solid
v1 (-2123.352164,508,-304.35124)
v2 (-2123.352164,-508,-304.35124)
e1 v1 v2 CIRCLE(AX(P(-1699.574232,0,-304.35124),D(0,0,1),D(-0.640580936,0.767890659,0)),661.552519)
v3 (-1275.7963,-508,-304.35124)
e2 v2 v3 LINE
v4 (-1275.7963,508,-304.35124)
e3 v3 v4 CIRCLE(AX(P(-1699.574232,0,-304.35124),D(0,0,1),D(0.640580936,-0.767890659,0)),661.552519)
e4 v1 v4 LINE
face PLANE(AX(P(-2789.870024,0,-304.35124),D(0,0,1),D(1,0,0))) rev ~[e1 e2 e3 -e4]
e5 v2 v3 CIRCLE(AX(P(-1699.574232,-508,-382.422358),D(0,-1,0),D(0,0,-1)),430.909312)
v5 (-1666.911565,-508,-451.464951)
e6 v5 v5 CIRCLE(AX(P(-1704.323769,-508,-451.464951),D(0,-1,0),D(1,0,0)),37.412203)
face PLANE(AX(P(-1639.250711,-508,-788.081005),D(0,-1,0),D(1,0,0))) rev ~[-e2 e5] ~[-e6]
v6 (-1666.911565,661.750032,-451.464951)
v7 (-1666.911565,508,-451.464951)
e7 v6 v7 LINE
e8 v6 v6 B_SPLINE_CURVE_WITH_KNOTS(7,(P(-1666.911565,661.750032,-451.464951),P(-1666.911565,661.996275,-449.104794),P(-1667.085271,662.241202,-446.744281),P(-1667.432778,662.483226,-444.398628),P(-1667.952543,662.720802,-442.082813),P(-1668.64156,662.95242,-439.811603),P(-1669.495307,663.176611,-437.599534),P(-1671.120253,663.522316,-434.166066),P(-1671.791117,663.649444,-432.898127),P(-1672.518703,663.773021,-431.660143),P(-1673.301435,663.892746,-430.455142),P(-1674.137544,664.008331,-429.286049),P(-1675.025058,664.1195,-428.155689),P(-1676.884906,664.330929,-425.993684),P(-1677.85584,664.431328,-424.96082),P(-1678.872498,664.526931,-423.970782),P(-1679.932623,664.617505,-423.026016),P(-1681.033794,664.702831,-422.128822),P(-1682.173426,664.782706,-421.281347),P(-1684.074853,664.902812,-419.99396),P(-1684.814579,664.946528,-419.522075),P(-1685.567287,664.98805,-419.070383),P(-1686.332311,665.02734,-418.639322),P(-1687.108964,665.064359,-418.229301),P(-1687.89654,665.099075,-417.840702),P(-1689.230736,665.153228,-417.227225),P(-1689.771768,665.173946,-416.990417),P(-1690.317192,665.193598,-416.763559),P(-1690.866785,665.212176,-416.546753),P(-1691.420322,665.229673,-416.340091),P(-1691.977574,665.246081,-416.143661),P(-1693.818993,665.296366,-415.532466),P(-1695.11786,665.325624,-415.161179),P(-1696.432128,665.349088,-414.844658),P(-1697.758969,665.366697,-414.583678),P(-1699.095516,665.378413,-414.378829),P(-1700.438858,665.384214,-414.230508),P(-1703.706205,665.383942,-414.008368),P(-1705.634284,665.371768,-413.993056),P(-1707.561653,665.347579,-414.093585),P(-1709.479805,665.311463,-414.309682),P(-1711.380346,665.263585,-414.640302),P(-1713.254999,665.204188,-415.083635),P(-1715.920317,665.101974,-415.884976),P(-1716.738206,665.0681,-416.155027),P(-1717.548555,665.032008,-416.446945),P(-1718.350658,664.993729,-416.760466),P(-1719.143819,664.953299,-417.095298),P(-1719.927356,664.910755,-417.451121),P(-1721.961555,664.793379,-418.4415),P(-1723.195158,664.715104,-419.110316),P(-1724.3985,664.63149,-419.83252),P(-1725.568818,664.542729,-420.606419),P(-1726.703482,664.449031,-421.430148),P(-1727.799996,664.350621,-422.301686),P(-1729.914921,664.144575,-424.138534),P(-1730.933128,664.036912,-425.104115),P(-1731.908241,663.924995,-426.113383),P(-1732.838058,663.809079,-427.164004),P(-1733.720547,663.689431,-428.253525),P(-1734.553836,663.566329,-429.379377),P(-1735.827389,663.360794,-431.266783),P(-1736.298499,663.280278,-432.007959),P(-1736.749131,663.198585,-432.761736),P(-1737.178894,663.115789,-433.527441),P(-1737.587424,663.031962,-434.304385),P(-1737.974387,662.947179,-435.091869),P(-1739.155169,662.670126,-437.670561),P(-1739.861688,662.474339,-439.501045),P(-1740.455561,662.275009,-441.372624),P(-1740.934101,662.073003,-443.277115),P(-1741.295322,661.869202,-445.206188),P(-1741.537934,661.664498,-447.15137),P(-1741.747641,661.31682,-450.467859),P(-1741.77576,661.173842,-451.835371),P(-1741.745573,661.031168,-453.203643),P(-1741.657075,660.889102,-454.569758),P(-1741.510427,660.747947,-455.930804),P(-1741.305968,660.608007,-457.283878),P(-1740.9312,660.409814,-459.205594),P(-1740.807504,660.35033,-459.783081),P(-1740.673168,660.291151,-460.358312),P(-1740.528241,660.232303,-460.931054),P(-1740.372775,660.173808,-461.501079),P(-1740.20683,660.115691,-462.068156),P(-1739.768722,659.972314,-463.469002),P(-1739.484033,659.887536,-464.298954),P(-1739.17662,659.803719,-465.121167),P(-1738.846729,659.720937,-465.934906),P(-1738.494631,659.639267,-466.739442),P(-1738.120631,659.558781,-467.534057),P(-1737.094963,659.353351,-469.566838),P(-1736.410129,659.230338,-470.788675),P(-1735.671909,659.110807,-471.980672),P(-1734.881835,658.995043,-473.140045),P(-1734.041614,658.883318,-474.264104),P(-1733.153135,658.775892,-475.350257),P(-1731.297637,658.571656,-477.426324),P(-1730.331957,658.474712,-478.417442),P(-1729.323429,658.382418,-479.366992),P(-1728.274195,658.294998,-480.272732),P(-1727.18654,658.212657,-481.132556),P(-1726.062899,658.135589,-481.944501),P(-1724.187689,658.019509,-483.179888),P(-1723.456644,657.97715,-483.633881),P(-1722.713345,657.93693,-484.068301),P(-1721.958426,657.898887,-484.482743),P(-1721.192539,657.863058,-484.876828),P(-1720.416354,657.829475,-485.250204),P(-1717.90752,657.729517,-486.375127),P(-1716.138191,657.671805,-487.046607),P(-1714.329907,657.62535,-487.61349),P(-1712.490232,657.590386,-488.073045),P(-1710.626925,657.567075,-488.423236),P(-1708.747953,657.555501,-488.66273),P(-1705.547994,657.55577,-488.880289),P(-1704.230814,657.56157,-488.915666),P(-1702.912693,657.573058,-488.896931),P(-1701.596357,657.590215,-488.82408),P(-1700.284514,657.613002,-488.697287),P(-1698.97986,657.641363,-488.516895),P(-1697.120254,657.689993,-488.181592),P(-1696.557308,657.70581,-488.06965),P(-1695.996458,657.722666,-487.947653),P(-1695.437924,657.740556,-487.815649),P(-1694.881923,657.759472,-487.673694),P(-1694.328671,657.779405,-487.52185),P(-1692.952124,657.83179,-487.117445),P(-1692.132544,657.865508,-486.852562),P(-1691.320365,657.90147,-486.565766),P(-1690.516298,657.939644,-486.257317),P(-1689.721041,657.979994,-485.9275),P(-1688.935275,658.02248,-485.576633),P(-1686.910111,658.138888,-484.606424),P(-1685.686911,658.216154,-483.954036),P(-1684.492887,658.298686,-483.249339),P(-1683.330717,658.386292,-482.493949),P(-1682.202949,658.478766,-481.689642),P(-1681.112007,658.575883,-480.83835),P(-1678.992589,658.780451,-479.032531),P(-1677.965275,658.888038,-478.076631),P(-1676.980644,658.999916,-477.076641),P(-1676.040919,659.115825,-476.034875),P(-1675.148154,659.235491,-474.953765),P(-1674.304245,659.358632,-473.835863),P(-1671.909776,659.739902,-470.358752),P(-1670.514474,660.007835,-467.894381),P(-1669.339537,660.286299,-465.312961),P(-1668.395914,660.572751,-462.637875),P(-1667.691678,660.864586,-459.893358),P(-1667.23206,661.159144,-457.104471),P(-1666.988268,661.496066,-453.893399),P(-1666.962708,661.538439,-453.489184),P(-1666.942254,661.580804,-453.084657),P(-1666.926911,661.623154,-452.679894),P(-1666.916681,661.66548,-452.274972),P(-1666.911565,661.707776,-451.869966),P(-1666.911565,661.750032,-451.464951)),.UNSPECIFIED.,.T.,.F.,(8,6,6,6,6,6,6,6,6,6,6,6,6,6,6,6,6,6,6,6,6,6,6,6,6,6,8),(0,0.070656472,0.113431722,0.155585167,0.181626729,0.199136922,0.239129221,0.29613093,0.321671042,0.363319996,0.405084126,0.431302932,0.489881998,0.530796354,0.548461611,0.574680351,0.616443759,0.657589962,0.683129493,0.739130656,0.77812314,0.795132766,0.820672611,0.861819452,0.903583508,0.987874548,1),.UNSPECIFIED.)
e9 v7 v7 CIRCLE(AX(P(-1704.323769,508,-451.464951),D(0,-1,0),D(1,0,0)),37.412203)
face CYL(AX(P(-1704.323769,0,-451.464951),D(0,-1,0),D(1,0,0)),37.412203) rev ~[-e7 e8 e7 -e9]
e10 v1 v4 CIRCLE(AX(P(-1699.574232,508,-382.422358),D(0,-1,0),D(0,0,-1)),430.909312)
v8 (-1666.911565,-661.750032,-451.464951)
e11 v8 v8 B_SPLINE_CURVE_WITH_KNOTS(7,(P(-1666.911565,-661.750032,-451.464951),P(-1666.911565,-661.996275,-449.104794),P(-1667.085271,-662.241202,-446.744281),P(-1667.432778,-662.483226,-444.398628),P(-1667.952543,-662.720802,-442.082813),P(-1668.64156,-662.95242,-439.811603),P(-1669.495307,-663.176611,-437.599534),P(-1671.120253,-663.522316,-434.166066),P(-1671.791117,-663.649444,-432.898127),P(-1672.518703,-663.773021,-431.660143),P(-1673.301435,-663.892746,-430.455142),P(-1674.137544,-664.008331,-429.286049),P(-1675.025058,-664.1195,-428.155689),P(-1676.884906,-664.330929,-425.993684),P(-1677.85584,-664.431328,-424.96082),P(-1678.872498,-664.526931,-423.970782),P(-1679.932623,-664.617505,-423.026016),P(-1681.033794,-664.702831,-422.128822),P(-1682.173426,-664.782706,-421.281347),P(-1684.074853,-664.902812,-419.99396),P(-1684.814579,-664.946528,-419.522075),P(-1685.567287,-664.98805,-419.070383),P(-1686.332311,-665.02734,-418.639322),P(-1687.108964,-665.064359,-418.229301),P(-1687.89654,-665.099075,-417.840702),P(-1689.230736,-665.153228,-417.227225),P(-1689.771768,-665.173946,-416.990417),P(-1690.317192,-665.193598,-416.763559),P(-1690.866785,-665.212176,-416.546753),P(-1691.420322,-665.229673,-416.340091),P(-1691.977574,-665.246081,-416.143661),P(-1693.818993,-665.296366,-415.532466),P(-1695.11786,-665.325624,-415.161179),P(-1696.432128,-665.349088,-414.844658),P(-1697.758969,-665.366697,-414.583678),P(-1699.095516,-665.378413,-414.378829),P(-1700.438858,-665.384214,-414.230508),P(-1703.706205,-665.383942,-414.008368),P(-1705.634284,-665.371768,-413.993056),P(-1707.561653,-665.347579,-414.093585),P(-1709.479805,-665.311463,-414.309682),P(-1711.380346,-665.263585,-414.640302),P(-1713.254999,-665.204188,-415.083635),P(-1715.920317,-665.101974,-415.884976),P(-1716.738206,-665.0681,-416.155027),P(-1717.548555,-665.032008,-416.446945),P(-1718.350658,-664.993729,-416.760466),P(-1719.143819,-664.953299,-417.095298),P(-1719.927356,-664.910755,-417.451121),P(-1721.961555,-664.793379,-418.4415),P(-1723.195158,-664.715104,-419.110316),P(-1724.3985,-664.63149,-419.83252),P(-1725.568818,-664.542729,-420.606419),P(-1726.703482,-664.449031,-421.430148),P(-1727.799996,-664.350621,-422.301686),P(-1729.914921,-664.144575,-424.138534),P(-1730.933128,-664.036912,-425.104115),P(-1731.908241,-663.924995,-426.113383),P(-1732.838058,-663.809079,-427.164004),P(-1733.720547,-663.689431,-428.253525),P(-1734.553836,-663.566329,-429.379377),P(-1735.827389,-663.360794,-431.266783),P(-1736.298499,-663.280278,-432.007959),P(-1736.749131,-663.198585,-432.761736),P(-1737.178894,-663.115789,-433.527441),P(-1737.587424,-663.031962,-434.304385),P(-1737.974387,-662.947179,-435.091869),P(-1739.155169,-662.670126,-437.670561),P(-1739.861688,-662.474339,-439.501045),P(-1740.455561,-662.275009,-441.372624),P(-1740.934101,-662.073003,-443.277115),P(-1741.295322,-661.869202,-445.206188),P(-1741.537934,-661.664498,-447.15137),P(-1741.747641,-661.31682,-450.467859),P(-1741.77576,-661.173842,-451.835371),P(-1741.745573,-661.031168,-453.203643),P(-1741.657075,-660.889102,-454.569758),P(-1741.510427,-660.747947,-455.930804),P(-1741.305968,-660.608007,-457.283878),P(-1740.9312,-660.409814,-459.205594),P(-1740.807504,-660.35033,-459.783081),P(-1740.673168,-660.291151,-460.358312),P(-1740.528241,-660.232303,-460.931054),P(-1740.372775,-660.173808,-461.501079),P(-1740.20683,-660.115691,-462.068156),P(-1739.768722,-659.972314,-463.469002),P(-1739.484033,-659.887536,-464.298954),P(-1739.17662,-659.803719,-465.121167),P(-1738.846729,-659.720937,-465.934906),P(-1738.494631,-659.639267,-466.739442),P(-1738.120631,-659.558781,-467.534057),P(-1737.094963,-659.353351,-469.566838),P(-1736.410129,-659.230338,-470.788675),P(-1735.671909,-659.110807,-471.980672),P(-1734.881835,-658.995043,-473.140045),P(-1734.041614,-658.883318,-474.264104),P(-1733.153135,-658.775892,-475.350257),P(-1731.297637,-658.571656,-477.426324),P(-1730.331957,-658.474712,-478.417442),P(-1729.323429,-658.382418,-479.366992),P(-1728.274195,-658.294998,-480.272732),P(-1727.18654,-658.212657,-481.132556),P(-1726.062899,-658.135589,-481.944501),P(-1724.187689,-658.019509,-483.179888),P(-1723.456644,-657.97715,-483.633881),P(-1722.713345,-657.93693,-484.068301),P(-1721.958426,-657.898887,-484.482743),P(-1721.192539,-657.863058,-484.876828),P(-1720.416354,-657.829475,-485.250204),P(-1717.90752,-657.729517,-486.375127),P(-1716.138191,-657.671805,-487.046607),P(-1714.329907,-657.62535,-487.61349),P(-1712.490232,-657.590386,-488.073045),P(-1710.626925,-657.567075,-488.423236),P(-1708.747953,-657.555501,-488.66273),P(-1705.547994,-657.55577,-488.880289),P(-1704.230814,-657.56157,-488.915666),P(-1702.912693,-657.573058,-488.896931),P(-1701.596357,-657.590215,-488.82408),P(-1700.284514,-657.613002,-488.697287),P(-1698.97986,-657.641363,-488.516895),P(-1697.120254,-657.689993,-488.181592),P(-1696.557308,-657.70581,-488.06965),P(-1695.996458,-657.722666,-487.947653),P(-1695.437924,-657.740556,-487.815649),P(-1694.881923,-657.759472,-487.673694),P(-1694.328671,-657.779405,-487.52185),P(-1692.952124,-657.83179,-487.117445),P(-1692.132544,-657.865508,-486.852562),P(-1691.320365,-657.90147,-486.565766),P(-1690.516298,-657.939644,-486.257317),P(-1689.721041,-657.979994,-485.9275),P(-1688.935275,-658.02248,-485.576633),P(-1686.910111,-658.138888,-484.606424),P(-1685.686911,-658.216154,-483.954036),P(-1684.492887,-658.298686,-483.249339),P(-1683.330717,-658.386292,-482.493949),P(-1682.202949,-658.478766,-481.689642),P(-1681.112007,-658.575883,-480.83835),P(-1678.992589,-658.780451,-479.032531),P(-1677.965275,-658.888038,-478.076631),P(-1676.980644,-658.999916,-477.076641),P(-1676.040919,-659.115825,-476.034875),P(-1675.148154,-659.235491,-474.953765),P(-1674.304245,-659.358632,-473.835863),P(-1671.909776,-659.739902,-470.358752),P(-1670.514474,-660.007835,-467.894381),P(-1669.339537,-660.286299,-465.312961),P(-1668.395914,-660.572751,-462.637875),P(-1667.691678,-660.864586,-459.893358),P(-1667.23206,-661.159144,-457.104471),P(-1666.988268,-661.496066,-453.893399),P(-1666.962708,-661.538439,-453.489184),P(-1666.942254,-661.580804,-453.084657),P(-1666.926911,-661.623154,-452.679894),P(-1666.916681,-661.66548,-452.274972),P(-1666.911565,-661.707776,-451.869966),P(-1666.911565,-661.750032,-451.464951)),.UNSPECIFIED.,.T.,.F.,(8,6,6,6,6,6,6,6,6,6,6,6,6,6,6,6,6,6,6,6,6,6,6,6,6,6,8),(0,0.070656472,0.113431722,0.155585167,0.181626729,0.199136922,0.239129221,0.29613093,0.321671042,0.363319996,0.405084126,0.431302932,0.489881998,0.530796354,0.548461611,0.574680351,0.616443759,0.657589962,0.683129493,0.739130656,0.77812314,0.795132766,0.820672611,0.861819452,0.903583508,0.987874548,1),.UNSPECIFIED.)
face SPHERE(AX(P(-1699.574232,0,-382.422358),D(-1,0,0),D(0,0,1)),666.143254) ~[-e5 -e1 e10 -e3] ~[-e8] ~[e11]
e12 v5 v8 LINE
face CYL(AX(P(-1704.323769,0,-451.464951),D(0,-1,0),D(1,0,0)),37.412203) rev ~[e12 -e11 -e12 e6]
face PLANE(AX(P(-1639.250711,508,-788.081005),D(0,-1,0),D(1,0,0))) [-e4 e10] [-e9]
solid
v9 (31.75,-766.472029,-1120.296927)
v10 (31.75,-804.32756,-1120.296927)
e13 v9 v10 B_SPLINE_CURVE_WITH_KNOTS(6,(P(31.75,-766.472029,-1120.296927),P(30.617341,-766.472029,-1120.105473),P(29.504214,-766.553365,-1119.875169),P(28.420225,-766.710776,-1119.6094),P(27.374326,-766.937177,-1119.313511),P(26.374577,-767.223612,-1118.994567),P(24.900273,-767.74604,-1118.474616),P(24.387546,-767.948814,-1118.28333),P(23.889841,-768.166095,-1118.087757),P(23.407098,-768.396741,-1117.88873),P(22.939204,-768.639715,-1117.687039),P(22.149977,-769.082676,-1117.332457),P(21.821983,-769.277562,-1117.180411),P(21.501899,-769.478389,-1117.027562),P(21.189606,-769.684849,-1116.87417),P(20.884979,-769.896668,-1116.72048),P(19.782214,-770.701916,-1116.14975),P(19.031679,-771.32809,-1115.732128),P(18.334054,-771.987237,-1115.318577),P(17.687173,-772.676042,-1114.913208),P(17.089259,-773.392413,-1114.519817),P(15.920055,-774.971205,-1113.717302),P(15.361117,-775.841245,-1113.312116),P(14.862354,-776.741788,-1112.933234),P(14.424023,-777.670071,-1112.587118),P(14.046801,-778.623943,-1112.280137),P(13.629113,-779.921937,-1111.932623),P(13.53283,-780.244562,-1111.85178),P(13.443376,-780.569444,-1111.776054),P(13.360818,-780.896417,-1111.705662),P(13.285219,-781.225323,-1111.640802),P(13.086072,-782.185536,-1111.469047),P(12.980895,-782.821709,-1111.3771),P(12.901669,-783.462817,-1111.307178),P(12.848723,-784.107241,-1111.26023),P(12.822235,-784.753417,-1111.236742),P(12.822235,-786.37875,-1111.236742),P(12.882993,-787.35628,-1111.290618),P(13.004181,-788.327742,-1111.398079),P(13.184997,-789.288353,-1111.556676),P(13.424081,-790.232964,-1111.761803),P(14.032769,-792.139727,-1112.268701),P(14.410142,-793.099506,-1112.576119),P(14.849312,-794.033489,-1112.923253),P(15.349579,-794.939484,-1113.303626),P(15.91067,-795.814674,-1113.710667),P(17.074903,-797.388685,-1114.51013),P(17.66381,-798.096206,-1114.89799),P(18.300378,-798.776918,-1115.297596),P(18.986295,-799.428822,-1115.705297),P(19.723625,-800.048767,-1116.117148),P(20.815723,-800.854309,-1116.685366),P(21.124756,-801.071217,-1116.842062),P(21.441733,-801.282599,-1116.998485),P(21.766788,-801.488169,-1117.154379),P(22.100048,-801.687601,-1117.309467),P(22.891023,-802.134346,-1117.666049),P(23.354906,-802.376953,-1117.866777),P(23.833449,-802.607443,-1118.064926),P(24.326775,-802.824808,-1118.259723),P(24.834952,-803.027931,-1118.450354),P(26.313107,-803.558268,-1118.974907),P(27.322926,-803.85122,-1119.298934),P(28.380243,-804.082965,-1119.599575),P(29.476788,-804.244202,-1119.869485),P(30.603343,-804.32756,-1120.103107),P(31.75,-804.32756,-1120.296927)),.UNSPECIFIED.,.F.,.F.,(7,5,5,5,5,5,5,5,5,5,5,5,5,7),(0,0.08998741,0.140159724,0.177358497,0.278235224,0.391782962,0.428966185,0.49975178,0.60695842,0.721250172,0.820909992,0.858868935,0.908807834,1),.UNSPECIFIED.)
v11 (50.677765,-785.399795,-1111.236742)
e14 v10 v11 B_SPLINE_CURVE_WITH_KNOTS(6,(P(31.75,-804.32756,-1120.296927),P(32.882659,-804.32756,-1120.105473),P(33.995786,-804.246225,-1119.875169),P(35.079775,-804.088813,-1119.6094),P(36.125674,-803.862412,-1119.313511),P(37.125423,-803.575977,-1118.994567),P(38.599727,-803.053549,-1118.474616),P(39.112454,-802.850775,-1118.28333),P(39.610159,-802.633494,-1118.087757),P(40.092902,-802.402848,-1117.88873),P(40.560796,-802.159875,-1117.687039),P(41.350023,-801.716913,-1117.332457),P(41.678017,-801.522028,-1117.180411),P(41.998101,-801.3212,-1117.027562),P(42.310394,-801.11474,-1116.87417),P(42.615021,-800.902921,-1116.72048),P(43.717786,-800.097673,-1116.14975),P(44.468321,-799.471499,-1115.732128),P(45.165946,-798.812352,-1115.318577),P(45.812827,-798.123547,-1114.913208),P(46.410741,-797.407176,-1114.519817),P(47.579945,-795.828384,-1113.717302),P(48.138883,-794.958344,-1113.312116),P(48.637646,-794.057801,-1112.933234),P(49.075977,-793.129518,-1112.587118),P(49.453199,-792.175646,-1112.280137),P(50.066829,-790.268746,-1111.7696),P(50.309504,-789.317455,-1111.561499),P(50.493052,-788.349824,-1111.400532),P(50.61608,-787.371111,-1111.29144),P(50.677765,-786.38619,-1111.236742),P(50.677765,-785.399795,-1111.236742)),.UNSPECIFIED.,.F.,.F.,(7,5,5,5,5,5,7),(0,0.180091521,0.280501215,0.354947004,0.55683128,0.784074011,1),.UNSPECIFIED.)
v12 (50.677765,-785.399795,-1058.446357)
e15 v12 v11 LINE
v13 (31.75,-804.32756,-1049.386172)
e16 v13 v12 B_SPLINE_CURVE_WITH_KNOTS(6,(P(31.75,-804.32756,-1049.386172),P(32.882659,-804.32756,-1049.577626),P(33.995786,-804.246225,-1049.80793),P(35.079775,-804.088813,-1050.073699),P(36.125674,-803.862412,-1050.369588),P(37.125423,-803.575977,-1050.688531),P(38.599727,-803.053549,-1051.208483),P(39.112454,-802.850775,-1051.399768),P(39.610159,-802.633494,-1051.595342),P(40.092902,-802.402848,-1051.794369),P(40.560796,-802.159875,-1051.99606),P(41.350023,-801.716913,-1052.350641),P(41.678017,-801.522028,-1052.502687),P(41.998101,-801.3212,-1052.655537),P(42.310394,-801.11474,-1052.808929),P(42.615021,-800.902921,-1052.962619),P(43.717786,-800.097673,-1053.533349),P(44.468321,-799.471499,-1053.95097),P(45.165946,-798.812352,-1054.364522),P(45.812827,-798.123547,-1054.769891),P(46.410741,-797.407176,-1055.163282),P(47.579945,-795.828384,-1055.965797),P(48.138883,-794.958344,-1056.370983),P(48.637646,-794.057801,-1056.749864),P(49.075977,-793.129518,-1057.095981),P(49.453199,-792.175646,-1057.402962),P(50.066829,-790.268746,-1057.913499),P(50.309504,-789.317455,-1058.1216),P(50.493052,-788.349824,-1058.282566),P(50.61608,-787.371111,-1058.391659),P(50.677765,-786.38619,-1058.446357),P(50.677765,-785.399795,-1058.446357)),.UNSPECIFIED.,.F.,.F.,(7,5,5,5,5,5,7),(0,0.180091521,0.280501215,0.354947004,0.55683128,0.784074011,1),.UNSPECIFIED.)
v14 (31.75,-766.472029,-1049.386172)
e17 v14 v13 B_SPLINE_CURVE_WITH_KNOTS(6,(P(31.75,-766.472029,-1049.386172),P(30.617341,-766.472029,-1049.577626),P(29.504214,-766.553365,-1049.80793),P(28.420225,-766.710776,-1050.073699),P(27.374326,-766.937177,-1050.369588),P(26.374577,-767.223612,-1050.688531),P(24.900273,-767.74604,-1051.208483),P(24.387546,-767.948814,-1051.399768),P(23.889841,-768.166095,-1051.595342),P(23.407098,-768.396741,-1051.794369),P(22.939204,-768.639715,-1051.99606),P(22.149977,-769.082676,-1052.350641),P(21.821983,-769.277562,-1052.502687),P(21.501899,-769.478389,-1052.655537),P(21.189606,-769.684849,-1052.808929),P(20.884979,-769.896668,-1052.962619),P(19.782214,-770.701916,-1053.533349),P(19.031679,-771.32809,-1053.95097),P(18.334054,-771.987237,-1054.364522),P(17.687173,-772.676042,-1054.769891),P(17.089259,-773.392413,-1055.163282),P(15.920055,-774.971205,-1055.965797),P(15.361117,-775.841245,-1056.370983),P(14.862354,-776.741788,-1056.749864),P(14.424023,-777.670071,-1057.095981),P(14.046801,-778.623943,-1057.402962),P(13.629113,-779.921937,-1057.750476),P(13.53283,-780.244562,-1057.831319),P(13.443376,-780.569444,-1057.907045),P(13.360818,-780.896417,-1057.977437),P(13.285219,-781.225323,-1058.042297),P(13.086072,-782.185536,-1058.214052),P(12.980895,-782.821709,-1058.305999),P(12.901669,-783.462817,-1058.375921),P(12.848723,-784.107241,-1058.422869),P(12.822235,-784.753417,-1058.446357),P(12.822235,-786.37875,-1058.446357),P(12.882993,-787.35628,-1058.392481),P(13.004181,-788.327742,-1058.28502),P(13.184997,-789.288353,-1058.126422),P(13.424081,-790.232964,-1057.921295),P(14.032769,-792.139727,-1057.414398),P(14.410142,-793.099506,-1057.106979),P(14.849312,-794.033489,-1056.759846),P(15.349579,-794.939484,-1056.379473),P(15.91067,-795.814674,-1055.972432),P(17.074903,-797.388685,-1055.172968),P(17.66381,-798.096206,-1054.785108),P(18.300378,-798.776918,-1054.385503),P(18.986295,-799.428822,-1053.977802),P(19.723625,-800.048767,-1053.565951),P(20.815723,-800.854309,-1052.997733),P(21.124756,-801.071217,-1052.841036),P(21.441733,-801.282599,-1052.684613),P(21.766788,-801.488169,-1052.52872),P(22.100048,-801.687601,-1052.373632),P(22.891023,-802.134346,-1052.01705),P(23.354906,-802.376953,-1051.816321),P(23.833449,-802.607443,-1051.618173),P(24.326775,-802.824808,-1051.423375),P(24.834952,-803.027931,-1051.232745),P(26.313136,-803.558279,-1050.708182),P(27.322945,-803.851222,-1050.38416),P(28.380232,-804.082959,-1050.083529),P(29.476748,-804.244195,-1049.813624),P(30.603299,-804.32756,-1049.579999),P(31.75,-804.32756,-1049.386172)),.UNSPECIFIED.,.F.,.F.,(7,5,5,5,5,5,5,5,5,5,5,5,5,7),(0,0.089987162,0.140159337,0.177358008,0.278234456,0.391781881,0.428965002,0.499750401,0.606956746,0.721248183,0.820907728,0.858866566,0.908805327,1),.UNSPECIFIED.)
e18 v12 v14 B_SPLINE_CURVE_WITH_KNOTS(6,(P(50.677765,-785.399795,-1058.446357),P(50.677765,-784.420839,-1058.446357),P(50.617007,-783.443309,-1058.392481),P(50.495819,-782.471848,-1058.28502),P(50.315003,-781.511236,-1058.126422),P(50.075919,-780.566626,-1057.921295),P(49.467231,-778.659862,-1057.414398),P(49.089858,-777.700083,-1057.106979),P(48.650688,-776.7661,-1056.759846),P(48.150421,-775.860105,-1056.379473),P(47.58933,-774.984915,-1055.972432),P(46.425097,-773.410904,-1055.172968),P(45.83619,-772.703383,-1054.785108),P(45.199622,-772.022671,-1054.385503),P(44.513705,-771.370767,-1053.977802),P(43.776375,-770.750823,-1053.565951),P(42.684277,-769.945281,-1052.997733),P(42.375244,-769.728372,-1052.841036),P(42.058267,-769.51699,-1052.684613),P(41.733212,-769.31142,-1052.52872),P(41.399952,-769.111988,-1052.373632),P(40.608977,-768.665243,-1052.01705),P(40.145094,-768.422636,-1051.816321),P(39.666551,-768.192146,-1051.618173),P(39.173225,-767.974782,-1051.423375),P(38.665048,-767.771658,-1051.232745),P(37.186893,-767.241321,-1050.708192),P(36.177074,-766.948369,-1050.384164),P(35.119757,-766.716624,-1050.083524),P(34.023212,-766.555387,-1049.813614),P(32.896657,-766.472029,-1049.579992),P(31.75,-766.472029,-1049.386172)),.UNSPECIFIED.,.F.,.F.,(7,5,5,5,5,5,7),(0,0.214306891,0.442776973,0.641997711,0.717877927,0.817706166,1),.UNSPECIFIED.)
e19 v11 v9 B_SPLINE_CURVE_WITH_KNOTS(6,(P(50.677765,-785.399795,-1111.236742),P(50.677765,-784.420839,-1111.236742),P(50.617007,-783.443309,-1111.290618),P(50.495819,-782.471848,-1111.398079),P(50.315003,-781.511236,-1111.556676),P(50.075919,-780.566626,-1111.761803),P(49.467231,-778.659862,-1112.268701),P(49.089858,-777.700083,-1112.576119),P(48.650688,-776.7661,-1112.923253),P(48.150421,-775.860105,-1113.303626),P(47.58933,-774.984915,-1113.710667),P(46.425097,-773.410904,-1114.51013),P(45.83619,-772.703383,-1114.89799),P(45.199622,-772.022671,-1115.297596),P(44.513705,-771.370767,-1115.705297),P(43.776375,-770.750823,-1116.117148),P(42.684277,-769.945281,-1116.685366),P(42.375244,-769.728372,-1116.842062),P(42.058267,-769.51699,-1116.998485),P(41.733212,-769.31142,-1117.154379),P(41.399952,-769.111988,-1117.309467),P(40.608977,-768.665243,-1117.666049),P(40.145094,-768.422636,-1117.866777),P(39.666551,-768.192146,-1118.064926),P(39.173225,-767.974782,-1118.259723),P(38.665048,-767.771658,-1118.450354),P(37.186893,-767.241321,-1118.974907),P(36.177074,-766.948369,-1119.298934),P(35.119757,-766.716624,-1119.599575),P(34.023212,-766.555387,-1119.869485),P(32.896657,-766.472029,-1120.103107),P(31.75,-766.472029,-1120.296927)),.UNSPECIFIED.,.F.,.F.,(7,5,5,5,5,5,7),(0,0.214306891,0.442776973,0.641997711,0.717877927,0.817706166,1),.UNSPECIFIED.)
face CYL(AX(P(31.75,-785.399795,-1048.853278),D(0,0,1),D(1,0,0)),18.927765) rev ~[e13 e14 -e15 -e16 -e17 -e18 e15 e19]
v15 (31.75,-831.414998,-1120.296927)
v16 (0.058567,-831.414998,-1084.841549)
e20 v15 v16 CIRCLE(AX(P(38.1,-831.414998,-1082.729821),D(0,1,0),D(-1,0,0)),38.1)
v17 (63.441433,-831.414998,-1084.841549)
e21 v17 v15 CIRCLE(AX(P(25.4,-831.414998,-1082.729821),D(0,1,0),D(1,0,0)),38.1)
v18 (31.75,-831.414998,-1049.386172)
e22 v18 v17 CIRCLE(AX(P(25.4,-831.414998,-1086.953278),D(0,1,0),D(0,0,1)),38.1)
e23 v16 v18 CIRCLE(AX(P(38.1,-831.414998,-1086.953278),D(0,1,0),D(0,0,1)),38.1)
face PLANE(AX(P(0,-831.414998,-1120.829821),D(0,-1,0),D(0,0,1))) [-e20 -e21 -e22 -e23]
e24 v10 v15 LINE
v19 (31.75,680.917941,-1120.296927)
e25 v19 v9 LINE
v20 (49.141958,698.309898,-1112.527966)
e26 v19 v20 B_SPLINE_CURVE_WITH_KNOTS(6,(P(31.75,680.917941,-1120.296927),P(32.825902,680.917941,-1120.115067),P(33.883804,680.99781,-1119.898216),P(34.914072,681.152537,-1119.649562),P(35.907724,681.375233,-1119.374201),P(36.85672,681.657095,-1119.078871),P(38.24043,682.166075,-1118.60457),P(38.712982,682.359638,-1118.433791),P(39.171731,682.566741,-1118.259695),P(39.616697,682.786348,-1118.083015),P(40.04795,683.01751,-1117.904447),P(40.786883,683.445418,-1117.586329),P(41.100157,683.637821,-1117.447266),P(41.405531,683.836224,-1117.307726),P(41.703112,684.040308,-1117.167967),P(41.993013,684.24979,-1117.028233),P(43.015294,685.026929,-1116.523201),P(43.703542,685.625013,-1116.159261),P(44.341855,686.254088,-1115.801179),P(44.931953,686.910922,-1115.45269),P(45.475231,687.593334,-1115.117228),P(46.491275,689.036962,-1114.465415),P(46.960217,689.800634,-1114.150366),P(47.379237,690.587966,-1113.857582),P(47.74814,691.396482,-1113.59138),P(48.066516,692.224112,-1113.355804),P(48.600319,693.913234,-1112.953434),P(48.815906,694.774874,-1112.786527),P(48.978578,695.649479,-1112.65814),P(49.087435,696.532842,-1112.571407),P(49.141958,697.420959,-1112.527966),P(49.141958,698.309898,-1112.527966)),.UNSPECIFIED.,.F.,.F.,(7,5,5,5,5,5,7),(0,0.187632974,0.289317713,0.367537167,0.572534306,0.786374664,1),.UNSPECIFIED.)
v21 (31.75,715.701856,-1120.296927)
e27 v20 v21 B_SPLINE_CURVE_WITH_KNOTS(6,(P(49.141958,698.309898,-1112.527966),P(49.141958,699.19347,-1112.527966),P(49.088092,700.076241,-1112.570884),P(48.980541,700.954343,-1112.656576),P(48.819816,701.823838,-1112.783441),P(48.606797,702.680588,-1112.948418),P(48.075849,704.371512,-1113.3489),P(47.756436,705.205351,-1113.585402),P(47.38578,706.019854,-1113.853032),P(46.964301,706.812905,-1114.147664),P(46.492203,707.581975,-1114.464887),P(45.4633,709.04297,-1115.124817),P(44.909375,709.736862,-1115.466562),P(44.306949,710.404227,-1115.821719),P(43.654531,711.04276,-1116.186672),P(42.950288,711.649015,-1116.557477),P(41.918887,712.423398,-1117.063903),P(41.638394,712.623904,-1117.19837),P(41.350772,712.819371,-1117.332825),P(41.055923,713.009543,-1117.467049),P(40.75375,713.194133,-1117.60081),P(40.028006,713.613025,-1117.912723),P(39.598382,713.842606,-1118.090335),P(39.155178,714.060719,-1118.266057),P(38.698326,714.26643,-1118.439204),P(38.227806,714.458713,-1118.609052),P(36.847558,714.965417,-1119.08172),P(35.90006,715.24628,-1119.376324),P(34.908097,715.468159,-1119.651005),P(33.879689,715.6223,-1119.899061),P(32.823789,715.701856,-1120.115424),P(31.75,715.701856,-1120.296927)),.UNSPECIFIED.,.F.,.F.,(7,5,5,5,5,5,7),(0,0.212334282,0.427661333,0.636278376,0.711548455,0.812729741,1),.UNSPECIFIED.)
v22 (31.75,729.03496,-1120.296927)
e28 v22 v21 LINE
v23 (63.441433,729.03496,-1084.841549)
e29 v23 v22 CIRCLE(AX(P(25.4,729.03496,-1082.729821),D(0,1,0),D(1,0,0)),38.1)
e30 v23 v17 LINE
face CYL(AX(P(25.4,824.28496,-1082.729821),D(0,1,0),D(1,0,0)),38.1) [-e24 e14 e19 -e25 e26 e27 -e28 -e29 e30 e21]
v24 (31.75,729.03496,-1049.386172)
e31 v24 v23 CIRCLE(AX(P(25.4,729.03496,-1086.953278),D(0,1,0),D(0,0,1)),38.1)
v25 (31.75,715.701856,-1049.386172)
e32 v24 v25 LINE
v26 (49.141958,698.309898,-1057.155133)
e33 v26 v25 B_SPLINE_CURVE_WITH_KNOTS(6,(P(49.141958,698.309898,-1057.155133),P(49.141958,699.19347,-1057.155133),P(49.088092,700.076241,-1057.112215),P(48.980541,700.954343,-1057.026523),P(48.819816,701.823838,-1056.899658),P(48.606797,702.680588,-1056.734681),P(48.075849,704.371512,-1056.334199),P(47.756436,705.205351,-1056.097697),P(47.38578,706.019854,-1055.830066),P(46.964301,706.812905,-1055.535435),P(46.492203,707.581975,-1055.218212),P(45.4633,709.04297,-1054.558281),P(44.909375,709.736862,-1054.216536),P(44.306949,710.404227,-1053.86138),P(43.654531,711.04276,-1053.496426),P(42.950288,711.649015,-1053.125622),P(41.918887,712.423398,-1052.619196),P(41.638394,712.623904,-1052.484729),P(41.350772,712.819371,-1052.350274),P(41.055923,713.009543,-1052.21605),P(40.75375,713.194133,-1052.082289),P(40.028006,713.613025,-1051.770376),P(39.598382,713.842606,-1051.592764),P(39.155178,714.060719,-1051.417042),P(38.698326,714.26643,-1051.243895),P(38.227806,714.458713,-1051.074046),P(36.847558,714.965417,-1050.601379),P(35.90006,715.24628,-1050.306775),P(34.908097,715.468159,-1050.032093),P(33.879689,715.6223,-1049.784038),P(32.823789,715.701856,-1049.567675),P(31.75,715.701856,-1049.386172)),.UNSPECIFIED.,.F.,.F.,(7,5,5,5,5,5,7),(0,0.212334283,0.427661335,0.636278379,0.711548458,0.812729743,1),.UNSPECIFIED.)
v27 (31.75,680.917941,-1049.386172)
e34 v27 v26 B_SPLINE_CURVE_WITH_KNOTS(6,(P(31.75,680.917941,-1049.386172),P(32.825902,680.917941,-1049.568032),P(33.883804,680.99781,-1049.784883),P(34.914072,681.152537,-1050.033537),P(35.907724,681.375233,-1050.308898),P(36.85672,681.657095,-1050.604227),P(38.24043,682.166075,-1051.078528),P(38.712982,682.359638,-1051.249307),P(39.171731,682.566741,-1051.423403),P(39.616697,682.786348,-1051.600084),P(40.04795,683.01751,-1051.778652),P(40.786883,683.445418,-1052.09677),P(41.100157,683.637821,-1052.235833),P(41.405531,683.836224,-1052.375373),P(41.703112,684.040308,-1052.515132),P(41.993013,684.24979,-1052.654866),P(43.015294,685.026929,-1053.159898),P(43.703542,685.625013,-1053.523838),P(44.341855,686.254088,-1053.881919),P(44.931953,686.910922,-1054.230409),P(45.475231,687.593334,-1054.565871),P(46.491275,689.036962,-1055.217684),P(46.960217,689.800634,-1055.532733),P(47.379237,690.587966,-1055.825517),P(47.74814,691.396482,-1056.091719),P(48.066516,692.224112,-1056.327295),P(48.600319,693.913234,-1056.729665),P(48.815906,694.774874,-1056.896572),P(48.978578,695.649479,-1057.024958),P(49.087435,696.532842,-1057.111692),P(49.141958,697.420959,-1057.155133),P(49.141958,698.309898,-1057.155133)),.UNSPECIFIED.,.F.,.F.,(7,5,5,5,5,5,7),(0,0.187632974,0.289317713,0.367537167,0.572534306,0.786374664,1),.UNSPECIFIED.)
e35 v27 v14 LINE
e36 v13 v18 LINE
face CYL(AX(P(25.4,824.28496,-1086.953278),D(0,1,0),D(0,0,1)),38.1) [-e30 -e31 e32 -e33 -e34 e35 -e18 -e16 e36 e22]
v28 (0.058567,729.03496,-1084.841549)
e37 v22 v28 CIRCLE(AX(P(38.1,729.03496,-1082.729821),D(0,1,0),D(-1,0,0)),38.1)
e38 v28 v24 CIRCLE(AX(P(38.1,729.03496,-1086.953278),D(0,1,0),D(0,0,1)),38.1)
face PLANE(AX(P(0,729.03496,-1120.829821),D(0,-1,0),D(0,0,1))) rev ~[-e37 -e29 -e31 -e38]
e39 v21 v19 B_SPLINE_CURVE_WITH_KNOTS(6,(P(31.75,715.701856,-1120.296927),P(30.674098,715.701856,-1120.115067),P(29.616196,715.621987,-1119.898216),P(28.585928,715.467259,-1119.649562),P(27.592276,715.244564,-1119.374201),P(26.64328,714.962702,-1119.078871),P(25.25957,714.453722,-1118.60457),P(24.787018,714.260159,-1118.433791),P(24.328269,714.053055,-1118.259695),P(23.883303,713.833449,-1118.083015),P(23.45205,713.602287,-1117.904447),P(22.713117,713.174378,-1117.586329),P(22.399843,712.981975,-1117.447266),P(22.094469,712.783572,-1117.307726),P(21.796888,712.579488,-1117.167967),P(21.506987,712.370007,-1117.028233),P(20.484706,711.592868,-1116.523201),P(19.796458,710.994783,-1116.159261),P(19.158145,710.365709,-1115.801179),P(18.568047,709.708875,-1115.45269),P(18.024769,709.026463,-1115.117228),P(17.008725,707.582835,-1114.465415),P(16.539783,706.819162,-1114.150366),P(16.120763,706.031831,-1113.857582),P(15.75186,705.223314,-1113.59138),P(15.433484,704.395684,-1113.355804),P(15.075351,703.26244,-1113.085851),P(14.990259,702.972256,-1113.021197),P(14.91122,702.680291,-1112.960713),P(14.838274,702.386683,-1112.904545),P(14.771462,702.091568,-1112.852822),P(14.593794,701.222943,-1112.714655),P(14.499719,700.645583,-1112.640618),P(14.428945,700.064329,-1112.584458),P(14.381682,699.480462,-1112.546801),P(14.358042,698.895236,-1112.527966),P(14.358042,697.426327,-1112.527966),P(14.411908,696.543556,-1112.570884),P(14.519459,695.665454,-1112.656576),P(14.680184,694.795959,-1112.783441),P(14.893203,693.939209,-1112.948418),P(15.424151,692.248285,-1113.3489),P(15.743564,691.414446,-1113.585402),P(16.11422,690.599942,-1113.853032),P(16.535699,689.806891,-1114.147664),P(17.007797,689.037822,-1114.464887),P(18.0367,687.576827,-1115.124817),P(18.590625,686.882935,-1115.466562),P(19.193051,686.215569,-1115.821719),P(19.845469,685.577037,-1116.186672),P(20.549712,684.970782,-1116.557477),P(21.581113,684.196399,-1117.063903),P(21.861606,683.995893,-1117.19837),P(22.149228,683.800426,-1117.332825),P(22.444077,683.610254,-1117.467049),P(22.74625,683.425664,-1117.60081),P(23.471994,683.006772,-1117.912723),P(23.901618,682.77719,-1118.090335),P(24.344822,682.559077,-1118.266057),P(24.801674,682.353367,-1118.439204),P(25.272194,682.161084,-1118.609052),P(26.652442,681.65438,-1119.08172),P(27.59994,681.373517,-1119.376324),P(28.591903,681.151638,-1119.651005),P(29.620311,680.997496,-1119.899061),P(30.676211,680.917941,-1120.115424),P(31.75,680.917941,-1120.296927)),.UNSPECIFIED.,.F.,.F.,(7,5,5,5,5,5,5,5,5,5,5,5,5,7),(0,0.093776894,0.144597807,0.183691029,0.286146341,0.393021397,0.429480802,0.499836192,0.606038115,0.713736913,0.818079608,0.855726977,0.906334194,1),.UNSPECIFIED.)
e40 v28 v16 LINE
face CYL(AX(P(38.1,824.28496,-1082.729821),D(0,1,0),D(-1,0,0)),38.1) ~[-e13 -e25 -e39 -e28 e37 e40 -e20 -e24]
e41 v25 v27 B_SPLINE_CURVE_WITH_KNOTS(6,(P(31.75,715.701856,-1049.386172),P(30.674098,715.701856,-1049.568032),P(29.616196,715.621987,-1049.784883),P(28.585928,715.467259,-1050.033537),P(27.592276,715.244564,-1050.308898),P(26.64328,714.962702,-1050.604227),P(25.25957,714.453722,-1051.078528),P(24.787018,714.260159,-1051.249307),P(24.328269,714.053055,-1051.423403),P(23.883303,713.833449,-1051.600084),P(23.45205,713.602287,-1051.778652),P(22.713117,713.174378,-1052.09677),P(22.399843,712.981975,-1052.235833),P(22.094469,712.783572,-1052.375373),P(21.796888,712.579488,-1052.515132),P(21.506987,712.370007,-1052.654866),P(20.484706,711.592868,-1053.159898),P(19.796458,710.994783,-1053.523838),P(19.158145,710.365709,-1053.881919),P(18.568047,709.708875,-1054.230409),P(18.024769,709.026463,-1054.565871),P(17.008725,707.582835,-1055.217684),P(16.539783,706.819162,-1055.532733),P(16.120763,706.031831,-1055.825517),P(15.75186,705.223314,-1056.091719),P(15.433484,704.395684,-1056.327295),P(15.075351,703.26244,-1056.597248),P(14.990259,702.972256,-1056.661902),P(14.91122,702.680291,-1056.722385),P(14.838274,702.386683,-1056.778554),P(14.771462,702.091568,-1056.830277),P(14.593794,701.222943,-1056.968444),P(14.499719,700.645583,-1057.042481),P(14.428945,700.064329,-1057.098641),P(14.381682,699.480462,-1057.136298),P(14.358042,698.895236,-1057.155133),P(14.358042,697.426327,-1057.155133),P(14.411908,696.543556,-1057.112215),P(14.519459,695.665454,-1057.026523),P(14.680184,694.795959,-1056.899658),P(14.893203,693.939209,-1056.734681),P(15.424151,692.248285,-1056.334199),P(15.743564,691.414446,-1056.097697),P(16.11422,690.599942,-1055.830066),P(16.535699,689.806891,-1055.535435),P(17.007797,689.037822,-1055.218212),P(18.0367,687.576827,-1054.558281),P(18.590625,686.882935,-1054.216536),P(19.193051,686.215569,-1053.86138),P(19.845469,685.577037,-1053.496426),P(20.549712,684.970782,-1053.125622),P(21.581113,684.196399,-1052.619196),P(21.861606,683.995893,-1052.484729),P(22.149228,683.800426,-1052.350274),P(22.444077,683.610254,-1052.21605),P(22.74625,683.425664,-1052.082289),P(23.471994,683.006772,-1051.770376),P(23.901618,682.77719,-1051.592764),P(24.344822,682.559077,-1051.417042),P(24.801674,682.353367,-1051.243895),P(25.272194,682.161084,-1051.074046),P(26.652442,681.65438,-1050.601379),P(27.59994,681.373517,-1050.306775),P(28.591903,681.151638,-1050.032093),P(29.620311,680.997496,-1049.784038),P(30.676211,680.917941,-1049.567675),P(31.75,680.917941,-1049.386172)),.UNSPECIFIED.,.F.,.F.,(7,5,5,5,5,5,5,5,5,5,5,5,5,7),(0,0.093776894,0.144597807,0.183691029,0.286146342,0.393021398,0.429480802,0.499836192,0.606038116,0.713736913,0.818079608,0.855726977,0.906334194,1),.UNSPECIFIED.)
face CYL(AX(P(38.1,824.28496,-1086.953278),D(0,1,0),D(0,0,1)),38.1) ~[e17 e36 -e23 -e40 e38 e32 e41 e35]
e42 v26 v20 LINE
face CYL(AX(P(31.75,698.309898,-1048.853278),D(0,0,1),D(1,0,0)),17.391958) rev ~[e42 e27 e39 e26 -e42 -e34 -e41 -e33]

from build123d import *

# Parameters (mm, degrees)
F2_W          = 2301.2386262417
F2_H          = 967.4595296383
F3_DEPTH      = 508
F3_DEPTH_BACK = 508
F4_W          = 1560.4499578476
F4_H          = 71.9765424728
F5_DEPTH      = 63.5
F6_R          = 37.4122033976
F7_DEPTH      = 952.5
F8_R          = 17.3919576193
F8_R_2        = 18.9277654493
F9_DEPTH      = 254
F10_T1_DEPTH  = 1750.9499578476


# Not quite as in the source:
# - a fillet or chamfer that OpenCascade refuses, or shapes differently, is made with other operations: its cross-section is extruded or revolved along the edge and cut away or added


with BuildPart() as f1:
    # F0 (on Front) → F1 (revolve)
    with BuildSketch(Plane.XZ):
        with BuildLine():
            Line((-1699.5742321014, -382.4223577976), (-1033.4309780598, -382.4223577976))
            ThreePointArc((-1033.4309780598, -382.4223577976), (-1699.5742321014, 283.720896244), (-2365.7174861431, -382.4223577976))
            Line((-2365.7174861431, -382.4223577976), (-1699.5742321014, -382.4223577976))
        make_face()
    revolve(axis=Axis((-1366.5026050806, 0, -382.4223577976), (1, 0, 0)))

    # F2 (on Front) → F3 (cut, two sides)
    with BuildSketch(Plane.XZ) as f3_sk:
        with Locations((-1639.2507106066, -788.0810052156)):
            Rectangle(F2_W, F2_H)
    extrude(amount=-F3_DEPTH, mode=Mode.SUBTRACT)
    extrude(f3_sk.sketch, amount=F3_DEPTH_BACK, mode=Mode.SUBTRACT)

    # F6 (on Front) → F7 (cut, symmetric)
    with BuildSketch(Plane.XZ):
        with Locations((-1704.3237686157, -451.4649510384)):
            Circle(F6_R)
    extrude(amount=F7_DEPTH, both=True, mode=Mode.SUBTRACT)


with BuildPart() as f5:
    # F4 (on Right) → F5 (new body)
    with BuildSketch(Plane.YZ):
        with Locations((-51.1900186539, -1084.8415493965)):
            Rectangle(F4_W, F4_H)
    extrude(amount=F5_DEPTH)

    # F8 (on face) → F9 (cut)
    with BuildSketch(Plane.XY.offset(-1048.8532781601)):
        with Locations((31.75, 698.3098983765)):
            Circle(F8_R)
        with Locations((31.75, -785.3997945786)):
            Circle(F8_R_2)
    extrude(amount=-F9_DEPTH, mode=Mode.SUBTRACT)

    # F10: fillet of radius 38.1 on 4 edges, made by hand

    # F10_s2 → F10_t1 (cut)
    with BuildSketch(Plane.XZ.offset(-824.2849602699)):
        with BuildLine():
            ThreePointArc((25.4, -1048.8532781601), (52.3407683632, -1060.0125097969), (63.5, -1086.9532781601))
            Line((63.5, -1086.9532781601), (63.5, -1048.8532781601))
            Line((63.5, -1048.8532781601), (25.4, -1048.8532781601))
        make_face()
        with BuildLine():
            ThreePointArc((63.5, -1082.7298206329), (52.3407683632, -1109.6705889961), (25.4, -1120.8298206329))
            Line((25.4, -1120.8298206329), (63.5, -1120.8298206329))
            Line((63.5, -1120.8298206329), (63.5, -1082.7298206329))
        make_face()
        with BuildLine():
            ThreePointArc((0, -1082.7298206329), (11.1592316368, -1109.6705889961), (38.1, -1120.8298206329))
            Line((38.1, -1120.8298206329), (0, -1120.8298206329))
            Line((0, -1120.8298206329), (0, -1082.7298206329))
        make_face()
        with BuildLine():
            ThreePointArc((38.1, -1048.8532781601), (11.1592316368, -1060.0125097969), (0, -1086.9532781601))
            Line((0, -1086.9532781601), (0, -1048.8532781601))
            Line((0, -1048.8532781601), (38.1, -1048.8532781601))
        make_face()
    extrude(amount=F10_T1_DEPTH, mode=Mode.SUBTRACT)


solid = Compound([f1.part, f5.part])
